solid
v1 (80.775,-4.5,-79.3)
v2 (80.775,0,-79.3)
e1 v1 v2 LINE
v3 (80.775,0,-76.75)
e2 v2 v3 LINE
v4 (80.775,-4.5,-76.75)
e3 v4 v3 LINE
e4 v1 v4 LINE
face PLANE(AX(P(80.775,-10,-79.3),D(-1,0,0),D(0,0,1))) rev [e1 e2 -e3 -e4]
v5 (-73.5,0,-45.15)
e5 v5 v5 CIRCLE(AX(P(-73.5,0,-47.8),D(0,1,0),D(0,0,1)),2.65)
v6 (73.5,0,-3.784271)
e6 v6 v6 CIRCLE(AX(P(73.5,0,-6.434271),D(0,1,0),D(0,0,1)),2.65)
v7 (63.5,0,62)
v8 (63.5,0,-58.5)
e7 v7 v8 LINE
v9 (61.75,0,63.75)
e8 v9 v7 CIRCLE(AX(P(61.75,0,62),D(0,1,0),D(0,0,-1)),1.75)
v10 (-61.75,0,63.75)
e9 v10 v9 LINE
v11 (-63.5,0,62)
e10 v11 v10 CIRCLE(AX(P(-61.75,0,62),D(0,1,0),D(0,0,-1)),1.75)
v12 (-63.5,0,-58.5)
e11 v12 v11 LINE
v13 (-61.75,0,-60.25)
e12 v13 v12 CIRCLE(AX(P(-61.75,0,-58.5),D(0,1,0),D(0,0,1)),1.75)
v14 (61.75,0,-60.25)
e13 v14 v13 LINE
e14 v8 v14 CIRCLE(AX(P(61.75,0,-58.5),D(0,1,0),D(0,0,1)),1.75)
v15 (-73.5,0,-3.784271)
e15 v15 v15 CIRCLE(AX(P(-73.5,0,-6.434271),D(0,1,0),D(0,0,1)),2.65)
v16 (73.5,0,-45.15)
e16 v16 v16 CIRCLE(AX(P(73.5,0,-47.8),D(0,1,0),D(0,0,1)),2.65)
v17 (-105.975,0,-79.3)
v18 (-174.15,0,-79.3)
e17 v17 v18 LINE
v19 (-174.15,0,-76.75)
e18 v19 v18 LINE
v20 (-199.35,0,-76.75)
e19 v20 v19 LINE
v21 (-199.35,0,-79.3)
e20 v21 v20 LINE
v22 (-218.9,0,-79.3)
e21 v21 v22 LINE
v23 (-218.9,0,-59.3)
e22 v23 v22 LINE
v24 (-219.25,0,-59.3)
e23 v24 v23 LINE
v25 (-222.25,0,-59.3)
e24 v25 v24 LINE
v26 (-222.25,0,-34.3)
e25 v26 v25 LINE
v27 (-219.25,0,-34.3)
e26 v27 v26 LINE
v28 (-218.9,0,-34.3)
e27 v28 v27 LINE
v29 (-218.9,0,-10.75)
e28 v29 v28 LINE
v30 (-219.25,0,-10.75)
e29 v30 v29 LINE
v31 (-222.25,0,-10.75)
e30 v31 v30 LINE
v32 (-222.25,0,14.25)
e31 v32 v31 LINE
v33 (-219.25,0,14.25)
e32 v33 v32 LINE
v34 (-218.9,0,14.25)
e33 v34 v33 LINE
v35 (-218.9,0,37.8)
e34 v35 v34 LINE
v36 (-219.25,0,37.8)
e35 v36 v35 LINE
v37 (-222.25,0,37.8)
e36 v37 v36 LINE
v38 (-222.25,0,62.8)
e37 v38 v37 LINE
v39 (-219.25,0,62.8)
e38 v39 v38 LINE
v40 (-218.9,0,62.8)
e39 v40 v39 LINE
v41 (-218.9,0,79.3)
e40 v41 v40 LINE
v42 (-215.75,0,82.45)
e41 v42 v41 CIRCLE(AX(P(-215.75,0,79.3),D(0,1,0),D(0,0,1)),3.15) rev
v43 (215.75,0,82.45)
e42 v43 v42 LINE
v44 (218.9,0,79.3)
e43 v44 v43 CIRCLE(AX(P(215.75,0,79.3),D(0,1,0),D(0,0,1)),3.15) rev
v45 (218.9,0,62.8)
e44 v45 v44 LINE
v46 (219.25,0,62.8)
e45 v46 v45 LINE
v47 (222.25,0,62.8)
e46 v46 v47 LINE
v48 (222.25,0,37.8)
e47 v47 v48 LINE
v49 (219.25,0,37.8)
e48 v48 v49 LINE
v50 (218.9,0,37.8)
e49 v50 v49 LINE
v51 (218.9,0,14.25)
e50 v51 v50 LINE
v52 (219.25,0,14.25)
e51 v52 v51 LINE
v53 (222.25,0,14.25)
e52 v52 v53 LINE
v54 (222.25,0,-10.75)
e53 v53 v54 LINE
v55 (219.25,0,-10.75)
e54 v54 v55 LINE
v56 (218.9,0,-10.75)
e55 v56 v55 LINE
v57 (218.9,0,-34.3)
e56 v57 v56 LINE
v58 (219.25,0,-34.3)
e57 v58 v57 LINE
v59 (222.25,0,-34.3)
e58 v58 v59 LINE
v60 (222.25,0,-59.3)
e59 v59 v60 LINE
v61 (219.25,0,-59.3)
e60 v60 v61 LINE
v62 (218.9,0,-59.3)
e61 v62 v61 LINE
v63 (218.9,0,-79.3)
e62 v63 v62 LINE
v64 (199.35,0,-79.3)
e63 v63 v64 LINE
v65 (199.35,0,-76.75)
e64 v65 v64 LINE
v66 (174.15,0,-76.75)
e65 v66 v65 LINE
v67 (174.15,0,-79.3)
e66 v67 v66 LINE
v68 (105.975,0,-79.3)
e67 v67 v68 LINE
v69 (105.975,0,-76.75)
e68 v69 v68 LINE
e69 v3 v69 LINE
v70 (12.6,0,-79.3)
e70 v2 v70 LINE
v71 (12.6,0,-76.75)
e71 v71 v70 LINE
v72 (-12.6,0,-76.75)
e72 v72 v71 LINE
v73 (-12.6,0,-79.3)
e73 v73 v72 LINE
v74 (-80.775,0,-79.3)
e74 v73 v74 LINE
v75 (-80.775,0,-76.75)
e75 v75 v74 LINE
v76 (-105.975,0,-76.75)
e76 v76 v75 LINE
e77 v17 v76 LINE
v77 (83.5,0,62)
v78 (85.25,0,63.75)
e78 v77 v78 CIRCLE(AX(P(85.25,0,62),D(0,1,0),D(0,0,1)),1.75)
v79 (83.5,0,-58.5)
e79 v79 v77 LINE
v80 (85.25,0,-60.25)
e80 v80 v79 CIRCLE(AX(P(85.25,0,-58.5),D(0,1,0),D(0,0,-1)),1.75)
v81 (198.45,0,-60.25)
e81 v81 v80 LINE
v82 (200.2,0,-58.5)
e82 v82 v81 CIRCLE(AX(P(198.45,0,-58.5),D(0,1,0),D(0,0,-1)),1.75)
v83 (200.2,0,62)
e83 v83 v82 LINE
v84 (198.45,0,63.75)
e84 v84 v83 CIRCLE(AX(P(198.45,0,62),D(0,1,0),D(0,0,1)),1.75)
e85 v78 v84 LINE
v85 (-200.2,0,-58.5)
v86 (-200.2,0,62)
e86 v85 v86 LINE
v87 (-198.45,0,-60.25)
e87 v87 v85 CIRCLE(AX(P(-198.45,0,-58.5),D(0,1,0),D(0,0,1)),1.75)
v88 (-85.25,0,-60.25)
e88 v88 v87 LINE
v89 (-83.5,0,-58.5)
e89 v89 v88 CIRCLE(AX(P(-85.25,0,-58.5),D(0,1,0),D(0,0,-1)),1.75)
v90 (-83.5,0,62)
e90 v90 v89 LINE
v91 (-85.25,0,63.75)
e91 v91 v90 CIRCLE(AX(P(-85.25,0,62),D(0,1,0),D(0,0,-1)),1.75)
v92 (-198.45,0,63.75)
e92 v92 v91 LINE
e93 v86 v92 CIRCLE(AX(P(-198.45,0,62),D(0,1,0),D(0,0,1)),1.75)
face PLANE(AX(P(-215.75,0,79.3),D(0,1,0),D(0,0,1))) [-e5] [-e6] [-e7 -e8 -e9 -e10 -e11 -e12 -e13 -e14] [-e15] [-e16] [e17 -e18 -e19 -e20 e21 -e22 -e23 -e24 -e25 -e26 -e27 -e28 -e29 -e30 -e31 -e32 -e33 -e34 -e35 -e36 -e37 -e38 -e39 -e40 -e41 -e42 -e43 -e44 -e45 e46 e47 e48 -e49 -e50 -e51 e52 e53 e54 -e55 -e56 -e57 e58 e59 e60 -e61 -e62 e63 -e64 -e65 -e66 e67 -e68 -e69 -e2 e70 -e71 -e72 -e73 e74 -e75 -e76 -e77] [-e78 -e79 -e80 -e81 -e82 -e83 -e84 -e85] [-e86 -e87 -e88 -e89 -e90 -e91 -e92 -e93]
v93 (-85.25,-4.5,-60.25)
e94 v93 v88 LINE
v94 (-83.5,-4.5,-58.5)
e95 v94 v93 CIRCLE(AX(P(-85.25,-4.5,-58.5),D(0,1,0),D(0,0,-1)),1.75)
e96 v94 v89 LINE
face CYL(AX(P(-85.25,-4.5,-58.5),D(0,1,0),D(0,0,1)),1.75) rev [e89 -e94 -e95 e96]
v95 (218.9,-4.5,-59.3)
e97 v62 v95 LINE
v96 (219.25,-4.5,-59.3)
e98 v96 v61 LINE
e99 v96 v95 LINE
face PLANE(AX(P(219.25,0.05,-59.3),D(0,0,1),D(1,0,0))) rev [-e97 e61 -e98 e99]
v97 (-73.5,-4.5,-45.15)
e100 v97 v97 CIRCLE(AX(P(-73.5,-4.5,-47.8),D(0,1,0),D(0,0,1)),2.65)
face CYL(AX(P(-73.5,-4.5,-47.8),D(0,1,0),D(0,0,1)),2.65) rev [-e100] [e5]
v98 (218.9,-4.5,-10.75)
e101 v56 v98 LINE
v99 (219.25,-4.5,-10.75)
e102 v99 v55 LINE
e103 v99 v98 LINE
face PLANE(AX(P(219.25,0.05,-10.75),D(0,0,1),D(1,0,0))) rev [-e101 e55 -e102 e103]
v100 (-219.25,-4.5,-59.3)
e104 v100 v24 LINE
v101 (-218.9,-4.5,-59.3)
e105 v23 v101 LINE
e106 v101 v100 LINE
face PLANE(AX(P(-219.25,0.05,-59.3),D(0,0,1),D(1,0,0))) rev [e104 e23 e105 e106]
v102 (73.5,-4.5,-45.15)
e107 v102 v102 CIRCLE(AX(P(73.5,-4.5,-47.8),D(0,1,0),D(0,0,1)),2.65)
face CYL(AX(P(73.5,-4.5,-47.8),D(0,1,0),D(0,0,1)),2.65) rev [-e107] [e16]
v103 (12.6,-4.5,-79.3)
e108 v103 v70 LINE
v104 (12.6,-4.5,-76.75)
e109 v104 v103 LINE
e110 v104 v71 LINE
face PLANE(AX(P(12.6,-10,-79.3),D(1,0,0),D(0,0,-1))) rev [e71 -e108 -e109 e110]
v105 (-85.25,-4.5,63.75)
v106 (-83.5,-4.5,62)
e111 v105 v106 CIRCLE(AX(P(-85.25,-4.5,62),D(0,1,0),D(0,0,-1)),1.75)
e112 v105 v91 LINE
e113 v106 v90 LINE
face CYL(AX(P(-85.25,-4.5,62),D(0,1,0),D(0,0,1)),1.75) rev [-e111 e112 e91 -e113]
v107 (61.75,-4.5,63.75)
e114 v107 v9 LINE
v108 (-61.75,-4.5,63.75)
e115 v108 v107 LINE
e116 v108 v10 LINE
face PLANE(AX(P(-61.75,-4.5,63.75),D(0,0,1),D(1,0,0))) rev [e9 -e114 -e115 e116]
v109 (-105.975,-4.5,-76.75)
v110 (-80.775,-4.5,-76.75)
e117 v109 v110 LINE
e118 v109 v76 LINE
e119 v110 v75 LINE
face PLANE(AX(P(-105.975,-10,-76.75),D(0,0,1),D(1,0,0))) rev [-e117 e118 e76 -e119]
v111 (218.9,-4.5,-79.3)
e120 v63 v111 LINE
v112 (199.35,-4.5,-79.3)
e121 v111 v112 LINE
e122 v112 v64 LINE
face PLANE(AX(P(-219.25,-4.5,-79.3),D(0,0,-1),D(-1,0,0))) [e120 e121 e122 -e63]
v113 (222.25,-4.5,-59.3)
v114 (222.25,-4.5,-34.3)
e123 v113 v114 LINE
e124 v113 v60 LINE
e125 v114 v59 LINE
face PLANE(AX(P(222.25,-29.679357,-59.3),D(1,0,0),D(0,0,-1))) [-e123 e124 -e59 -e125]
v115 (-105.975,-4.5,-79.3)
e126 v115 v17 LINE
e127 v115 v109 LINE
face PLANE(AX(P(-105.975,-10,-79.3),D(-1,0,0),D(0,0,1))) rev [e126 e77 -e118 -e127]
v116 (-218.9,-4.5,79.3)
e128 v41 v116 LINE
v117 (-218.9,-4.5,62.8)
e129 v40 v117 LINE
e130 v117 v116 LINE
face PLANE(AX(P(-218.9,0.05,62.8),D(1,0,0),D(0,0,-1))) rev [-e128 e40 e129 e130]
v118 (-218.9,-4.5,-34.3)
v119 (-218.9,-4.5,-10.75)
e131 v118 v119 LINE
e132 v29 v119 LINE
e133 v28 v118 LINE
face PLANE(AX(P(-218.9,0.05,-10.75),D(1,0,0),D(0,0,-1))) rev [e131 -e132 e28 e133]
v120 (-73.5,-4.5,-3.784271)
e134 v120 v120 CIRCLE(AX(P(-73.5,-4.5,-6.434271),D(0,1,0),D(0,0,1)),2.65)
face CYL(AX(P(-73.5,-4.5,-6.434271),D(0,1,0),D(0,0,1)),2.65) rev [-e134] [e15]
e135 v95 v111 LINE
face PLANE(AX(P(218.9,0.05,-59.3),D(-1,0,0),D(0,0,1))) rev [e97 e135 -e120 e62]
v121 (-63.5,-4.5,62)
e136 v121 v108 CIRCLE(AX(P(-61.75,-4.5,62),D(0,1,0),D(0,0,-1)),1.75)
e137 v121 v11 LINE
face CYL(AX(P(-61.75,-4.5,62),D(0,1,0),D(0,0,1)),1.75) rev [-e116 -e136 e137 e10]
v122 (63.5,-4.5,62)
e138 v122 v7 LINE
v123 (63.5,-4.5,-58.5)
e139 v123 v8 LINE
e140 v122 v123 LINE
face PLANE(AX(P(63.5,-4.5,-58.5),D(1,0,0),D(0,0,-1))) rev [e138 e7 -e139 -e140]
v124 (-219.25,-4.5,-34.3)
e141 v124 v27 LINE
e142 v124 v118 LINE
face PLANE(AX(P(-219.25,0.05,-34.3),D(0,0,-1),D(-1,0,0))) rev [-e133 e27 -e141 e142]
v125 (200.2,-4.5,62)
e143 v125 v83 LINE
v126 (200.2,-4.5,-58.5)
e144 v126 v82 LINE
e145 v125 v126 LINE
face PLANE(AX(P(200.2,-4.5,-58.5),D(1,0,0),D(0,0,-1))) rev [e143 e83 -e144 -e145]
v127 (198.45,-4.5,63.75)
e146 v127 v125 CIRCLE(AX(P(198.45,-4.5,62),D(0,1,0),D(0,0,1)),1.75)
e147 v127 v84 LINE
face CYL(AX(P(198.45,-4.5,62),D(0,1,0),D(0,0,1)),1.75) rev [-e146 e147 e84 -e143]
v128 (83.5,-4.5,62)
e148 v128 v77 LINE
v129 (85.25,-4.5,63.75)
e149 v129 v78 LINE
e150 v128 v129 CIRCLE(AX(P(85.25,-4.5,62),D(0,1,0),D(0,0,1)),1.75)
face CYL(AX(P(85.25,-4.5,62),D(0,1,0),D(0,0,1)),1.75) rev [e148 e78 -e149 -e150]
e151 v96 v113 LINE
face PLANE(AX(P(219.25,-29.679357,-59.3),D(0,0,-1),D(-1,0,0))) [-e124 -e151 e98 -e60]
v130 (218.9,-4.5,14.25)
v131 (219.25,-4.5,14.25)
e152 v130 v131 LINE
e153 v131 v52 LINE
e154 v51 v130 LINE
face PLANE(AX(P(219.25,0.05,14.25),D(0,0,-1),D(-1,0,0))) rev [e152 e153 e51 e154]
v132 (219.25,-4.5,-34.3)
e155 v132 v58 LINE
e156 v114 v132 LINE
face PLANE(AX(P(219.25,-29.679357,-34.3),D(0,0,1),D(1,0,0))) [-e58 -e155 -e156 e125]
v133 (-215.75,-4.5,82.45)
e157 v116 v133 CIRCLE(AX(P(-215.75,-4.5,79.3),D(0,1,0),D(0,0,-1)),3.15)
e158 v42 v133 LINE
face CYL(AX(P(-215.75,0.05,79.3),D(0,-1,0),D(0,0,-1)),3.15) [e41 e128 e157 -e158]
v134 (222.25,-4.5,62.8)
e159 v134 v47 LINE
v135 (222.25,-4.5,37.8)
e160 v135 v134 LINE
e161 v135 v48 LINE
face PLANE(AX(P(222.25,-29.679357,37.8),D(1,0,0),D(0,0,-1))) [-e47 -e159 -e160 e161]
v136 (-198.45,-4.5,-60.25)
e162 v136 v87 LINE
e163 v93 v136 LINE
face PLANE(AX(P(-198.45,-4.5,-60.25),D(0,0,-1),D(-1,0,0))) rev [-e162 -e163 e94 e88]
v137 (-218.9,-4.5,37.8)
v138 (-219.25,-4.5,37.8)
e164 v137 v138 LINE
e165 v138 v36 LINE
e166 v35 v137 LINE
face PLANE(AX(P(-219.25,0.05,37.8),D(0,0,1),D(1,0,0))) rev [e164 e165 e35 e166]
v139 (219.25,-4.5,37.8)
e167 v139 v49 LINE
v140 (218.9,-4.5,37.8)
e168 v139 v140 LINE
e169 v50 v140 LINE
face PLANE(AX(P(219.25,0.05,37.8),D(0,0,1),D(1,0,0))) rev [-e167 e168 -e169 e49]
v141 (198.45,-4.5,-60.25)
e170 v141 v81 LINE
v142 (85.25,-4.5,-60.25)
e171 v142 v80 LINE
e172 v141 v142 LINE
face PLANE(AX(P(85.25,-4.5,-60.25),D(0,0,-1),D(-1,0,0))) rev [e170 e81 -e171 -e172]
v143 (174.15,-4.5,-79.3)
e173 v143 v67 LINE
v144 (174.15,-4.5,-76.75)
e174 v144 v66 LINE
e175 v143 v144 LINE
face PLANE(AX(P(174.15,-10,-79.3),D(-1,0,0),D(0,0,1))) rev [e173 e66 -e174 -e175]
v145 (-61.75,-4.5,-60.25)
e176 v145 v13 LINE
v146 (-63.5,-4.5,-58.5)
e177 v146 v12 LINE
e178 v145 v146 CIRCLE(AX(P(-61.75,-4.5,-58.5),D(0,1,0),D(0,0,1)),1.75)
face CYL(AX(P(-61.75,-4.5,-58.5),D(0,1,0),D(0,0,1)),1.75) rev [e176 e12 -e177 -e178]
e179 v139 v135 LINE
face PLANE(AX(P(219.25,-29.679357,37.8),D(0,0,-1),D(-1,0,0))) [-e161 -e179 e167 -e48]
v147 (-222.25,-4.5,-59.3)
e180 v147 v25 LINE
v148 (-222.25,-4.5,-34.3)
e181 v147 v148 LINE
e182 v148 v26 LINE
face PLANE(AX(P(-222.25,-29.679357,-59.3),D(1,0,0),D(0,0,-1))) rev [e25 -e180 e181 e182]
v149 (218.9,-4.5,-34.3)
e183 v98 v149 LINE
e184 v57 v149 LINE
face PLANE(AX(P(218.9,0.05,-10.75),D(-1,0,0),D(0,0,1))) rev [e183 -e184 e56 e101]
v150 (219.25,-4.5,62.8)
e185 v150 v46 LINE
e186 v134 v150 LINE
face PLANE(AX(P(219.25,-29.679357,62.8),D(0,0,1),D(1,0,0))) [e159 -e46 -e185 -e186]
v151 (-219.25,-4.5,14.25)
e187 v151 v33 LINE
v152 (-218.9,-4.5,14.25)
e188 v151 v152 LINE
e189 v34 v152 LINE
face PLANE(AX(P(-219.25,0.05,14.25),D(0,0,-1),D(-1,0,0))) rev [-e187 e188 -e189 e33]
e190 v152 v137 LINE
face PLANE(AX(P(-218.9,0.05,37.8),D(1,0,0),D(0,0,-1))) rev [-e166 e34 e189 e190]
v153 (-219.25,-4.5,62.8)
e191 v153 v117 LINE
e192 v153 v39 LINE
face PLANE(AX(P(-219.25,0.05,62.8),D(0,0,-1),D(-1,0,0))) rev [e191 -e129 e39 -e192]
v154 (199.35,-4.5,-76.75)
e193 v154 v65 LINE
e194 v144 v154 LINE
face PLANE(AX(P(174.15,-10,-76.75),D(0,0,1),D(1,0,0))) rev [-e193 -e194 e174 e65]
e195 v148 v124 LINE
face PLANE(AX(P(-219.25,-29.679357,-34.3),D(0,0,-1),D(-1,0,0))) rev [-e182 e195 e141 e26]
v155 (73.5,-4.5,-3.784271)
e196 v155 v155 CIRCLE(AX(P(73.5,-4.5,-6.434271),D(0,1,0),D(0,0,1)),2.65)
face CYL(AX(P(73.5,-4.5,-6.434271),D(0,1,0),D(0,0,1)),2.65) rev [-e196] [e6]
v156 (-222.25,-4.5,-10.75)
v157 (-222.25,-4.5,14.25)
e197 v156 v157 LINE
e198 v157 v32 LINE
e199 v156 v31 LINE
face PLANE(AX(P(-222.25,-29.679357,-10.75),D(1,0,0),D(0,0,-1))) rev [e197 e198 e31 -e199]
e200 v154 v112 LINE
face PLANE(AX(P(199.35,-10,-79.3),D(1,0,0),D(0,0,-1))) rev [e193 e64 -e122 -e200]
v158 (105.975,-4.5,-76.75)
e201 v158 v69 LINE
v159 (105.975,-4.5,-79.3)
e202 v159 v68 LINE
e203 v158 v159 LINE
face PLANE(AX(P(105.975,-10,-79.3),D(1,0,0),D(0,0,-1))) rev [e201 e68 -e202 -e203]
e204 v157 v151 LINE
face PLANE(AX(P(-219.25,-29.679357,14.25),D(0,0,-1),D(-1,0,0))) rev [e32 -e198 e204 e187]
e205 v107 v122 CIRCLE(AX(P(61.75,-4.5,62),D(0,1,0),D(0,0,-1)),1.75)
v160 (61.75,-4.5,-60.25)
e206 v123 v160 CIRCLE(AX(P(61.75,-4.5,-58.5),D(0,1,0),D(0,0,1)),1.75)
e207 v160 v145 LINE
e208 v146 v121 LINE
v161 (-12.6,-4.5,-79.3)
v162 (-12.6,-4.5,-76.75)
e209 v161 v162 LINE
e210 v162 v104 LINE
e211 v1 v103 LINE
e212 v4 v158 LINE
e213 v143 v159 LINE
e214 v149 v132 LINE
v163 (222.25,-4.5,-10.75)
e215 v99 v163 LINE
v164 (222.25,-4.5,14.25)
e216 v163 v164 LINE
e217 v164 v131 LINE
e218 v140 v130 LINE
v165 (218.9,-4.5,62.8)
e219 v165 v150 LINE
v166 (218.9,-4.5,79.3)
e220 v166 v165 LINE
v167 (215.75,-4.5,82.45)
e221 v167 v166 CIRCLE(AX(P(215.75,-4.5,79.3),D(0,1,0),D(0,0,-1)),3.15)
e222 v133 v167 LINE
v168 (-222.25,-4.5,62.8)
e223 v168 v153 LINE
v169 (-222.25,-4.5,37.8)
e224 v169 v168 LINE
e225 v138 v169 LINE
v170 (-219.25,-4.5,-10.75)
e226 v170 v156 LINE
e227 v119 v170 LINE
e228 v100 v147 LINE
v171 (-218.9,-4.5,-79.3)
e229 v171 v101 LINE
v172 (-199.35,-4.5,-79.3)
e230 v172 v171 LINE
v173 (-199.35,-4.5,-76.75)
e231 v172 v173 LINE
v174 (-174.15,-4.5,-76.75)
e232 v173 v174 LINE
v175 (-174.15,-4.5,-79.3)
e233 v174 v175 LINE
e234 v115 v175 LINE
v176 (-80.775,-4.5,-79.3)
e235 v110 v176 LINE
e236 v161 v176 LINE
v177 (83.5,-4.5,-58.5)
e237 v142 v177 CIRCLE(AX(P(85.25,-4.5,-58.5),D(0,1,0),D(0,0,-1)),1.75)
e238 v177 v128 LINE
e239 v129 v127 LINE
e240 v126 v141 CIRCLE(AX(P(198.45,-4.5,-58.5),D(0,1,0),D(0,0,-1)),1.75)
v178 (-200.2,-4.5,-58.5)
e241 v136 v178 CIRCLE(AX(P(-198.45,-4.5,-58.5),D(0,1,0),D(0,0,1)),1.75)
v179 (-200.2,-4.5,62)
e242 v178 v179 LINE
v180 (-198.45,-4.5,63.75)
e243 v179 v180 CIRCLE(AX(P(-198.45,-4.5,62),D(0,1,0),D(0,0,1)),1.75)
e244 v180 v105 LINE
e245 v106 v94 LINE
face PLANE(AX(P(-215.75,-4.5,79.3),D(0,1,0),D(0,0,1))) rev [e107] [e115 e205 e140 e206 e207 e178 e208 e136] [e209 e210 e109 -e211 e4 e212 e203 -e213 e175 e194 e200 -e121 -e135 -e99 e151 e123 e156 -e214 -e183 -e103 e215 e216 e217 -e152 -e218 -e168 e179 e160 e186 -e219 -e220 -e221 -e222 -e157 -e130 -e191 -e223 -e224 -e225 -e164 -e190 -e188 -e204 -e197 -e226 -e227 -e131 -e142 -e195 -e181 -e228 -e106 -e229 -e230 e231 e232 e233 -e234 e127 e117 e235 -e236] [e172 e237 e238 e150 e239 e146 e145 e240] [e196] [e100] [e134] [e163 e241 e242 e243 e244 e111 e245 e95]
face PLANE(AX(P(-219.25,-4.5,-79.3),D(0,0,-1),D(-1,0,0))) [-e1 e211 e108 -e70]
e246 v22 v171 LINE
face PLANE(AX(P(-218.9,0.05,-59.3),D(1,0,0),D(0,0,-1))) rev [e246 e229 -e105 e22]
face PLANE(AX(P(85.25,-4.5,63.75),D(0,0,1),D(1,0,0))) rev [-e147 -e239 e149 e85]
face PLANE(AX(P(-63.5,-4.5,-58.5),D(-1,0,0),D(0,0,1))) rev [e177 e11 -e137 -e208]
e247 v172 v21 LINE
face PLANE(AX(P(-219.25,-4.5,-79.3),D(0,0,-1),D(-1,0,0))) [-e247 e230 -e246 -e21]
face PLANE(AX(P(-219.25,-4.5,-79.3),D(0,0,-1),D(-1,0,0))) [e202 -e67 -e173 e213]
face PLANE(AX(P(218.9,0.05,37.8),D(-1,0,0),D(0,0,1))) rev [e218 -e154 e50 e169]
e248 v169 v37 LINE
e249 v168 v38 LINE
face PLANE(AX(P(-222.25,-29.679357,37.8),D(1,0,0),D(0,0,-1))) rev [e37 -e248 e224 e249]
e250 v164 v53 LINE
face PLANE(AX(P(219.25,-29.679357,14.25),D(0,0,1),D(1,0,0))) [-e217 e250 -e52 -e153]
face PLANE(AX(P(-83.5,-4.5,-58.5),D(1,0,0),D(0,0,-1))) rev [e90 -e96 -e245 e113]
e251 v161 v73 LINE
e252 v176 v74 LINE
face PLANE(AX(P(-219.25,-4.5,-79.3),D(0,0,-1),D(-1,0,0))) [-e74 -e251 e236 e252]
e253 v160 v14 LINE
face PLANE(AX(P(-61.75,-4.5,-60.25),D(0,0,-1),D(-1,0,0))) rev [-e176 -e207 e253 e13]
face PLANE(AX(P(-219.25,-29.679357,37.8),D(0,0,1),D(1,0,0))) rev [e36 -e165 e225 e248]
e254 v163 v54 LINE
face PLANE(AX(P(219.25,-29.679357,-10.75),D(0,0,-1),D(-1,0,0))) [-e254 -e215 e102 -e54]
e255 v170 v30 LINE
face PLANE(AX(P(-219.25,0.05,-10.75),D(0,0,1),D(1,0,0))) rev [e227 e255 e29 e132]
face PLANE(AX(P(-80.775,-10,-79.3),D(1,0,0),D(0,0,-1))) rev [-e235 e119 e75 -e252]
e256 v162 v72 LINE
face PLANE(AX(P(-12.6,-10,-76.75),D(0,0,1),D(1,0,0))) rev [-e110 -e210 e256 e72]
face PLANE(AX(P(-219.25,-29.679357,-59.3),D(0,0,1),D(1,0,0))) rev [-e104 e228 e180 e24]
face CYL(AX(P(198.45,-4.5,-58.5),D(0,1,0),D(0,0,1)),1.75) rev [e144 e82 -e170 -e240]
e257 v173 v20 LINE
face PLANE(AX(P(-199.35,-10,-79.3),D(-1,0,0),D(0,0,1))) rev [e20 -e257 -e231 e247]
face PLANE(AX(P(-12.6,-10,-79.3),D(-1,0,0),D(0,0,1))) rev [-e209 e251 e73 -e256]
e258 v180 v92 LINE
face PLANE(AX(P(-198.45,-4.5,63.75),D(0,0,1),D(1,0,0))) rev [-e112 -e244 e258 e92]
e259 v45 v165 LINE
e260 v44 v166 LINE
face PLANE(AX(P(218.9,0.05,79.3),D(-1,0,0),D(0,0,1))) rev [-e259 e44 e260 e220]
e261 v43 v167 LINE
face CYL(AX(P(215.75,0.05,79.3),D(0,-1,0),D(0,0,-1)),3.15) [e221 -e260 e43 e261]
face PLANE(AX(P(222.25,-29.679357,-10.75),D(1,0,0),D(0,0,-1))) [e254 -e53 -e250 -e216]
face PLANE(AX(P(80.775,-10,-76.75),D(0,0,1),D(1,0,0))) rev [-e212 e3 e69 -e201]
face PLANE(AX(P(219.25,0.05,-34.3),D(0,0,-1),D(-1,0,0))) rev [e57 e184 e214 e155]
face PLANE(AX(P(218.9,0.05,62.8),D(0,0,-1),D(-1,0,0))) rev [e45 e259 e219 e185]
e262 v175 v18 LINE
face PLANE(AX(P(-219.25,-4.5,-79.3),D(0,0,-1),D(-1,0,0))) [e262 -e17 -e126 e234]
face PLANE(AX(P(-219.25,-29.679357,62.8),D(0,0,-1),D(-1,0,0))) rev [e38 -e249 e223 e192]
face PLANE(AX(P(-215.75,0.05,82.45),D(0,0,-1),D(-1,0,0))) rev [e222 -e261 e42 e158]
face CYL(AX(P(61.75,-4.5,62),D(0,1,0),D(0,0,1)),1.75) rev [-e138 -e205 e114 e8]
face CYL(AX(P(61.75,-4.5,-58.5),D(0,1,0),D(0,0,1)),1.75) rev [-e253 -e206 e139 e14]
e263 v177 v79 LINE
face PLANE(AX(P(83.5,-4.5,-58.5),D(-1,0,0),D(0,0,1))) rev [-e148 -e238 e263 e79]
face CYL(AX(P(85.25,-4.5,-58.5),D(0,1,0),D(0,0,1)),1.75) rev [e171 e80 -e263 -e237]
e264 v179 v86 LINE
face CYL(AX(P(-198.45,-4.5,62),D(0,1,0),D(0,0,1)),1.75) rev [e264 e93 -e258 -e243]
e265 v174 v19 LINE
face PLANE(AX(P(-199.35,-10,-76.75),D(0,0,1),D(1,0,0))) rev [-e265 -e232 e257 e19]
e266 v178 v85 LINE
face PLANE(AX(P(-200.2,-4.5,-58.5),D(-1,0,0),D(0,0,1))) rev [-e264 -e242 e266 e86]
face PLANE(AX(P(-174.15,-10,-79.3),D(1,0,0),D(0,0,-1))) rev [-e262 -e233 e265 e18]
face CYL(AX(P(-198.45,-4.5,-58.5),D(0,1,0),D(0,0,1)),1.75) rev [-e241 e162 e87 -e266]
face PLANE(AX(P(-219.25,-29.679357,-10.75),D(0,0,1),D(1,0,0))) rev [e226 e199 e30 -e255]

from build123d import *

# Parameters (mm, degrees)
BASE_FLANGE1_DEPTH  = 4.5
CUT_EXTRUDE1_DEPTH  = 235.407023146
SKETCH7_W           = 25.2
SKETCH7_H           = 2.55
CUT_EXTRUDE2_DEPTH  = 10
SKETCH8_W           = 3
SKETCH8_H           = 25
BOSS_EXTRUDE1_DEPTH = 4.5
CUT_EXTRUDE3_START  = -4.55
SKETCH10_W          = 0.35
SKETCH10_H          = 23.55
SKETCH10_H_2        = 20
CUT_EXTRUDE3_DEPTH  = 4.55
SKETCH11_R          = 2.65
CUT_EXTRUDE4_DEPTH  = 238.093473128


# Sheet-metal steps are written as plain solids
with BuildPart() as part:
    # Sketch1 → Base-Flange1 (new body)
    with BuildSketch(Plane(origin=(0, 0, 0), x_dir=(1, 0, 0), z_dir=(0, 1, 0))):
        with BuildLine():
            Line((-219.25, 79.3), (219.25, 79.3))
            Line((219.25, 79.3), (219.25, -79.3))
            ThreePointArc((219.25, -79.3), (218.224873734, -81.774873734), (215.75, -82.8))
            Line((215.75, -82.8), (-215.75, -82.8))
            ThreePointArc((-215.75, -82.8), (-218.224873734, -81.774873734), (-219.25, -79.3))
            Line((-219.25, -79.3), (-219.25, 79.3))
        make_face()
    extrude(amount=-BASE_FLANGE1_DEPTH)

    # Sketch6 → Cut-Extrude1 (cut, through all)
    with BuildSketch(Plane(origin=(0, 0, 0), x_dir=(1, 0, 0), z_dir=(0, 1, 0))):
        with BuildLine():
            Line((-198.45, 60.25), (-85.25, 60.25))
            ThreePointArc((-85.25, 60.25), (-84.012563133, 59.737436867), (-83.5, 58.5))
            Line((-83.5, 58.5), (-83.5, -62))
            ThreePointArc((-83.5, -62), (-84.012563133, -63.237436867), (-85.25, -63.75))
            Line((-85.25, -63.75), (-198.45, -63.75))
            ThreePointArc((-198.45, -63.75), (-199.687436867, -63.237436867), (-200.2, -62))
            Line((-200.2, -62), (-200.2, 58.5))
            ThreePointArc((-200.2, 58.5), (-199.687436867, 59.737436867), (-198.45, 60.25))
        make_face()
        with BuildLine():
            Line((200.2, 58.5), (200.2, -62))
            ThreePointArc((200.2, -62), (199.687436867, -63.237436867), (198.45, -63.75))
            Line((198.45, -63.75), (85.25, -63.75))
            ThreePointArc((85.25, -63.75), (84.012563133, -63.237436867), (83.5, -62))
            Line((83.5, -62), (83.5, 58.5))
            ThreePointArc((83.5, 58.5), (84.012563133, 59.737436867), (85.25, 60.25))
            Line((85.25, 60.25), (198.45, 60.25))
            ThreePointArc((198.45, 60.25), (199.687436867, 59.737436867), (200.2, 58.5))
        make_face()
        with BuildLine():
            Line((63.5, 58.5), (63.5, -62))
            ThreePointArc((63.5, -62), (62.987436867, -63.237436867), (61.75, -63.75))
            Line((61.75, -63.75), (-61.75, -63.75))
            ThreePointArc((-61.75, -63.75), (-62.987436867, -63.237436867), (-63.5, -62))
            Line((-63.5, -62), (-63.5, 58.5))
            ThreePointArc((-63.5, 58.5), (-62.987436867, 59.737436867), (-61.75, 60.25))
            Line((-61.75, 60.25), (61.75, 60.25))
            ThreePointArc((61.75, 60.25), (62.987436867, 59.737436867), (63.5, 58.5))
        make_face()
    extrude(amount=-CUT_EXTRUDE1_DEPTH, mode=Mode.SUBTRACT)

    # Sketch7 → Cut-Extrude2 (cut)
    with BuildSketch(Plane(origin=(0, 0, 0), x_dir=(1, 0, 0), z_dir=(0, 1, 0))):
        with Locations((-186.75, 78.025)):
            Rectangle(SKETCH7_W, SKETCH7_H)
        with Locations((-93.375, 78.025)):
            Rectangle(SKETCH7_W, SKETCH7_H)
        with Locations((0, 78.025)):
            Rectangle(SKETCH7_W, SKETCH7_H)
        with Locations((93.375, 78.025)):
            Rectangle(SKETCH7_W, SKETCH7_H)
        with Locations((186.75, 78.025)):
            Rectangle(SKETCH7_W, SKETCH7_H)
    extrude(amount=-CUT_EXTRUDE2_DEPTH, mode=Mode.SUBTRACT)

    # Sketch8 → Boss-Extrude1 (add)
    with BuildSketch(Plane(origin=(0, 0, 0), x_dir=(1, 0, 0), z_dir=(0, 1, 0))):
        with Locations((220.75, -1.75)):
            Rectangle(SKETCH8_W, SKETCH8_H)
        with Locations((220.75, 46.8)):
            Rectangle(SKETCH8_W, SKETCH8_H)
        with Locations((220.75, -50.3)):
            Rectangle(SKETCH8_W, SKETCH8_H)
    boss_extrude1 = extrude(amount=-BOSS_EXTRUDE1_DEPTH)

    # Mirror1: Boss-Extrude1 across plane
    add(boss_extrude1.mirror(Plane(origin=(0, 0, 0), x_dir=(0, 0, 1), z_dir=(1, 0, 0))))

    # Sketch10 → Cut-Extrude3 (cut)
    with BuildSketch(Plane.XZ.offset(4.5).offset(CUT_EXTRUDE3_START)):
        with Locations((-219.075, 26.025)):
            Rectangle(SKETCH10_W, SKETCH10_H)
        with Locations((-219.075, -22.525)):
            Rectangle(SKETCH10_W, SKETCH10_H)
        with Locations((-219.075, -69.3)):
            Rectangle(SKETCH10_W, SKETCH10_H_2)
        with BuildLine():
            Line((218.9, 79.3), (218.9, 62.8))
            Line((218.9, 62.8), (219.25, 62.8))
            Line((219.25, 62.8), (219.25, 79.3))
            ThreePointArc((219.25, 79.3), (218.224873734, 81.774873734), (215.75, 82.8))
            Line((215.75, 82.8), (-215.75, 82.8))
            ThreePointArc((-215.75, 82.8), (-218.224873734, 81.774873734), (-219.25, 79.3))
            Line((-219.25, 79.3), (-219.25, 62.8))
            Line((-219.25, 62.8), (-218.9, 62.8))
            Line((-218.9, 62.8), (-218.9, 79.3))
            ThreePointArc((-218.9, 79.3), (-217.977386361, 81.527386361), (-215.75, 82.45))
            Line((-215.75, 82.45), (215.75, 82.45))
            ThreePointArc((215.75, 82.45), (217.977386361, 81.527386361), (218.9, 79.3))
        make_face()
        with Locations((219.075, 26.025)):
            Rectangle(SKETCH10_W, SKETCH10_H)
        with Locations((219.075, -22.525)):
            Rectangle(SKETCH10_W, SKETCH10_H)
        with Locations((219.075, -69.3)):
            Rectangle(SKETCH10_W, SKETCH10_H_2)
    extrude(amount=CUT_EXTRUDE3_DEPTH, mode=Mode.SUBTRACT)

    # Sketch11 → Cut-Extrude4 (cut, through all)
    with BuildSketch(Plane(origin=(0, 0, 0), x_dir=(1, 0, 0), z_dir=(0, 1, 0))):
        with Locations(Location((73.5, 47.8, 0), (0, 0, 270))):
            Circle(SKETCH11_R)
        with Locations(Location((73.5, 6.434271247, 0), (0, 0, 270))):
            Circle(SKETCH11_R)
        with Locations(Location((-73.5, 6.434271247, 0), (0, 0, 270))):
            Circle(SKETCH11_R)
        with Locations(Location((-73.5, 47.8, 0), (0, 0, 270))):
            Circle(SKETCH11_R)
    extrude(amount=-CUT_EXTRUDE4_DEPTH, mode=Mode.SUBTRACT)


solid = part.part
